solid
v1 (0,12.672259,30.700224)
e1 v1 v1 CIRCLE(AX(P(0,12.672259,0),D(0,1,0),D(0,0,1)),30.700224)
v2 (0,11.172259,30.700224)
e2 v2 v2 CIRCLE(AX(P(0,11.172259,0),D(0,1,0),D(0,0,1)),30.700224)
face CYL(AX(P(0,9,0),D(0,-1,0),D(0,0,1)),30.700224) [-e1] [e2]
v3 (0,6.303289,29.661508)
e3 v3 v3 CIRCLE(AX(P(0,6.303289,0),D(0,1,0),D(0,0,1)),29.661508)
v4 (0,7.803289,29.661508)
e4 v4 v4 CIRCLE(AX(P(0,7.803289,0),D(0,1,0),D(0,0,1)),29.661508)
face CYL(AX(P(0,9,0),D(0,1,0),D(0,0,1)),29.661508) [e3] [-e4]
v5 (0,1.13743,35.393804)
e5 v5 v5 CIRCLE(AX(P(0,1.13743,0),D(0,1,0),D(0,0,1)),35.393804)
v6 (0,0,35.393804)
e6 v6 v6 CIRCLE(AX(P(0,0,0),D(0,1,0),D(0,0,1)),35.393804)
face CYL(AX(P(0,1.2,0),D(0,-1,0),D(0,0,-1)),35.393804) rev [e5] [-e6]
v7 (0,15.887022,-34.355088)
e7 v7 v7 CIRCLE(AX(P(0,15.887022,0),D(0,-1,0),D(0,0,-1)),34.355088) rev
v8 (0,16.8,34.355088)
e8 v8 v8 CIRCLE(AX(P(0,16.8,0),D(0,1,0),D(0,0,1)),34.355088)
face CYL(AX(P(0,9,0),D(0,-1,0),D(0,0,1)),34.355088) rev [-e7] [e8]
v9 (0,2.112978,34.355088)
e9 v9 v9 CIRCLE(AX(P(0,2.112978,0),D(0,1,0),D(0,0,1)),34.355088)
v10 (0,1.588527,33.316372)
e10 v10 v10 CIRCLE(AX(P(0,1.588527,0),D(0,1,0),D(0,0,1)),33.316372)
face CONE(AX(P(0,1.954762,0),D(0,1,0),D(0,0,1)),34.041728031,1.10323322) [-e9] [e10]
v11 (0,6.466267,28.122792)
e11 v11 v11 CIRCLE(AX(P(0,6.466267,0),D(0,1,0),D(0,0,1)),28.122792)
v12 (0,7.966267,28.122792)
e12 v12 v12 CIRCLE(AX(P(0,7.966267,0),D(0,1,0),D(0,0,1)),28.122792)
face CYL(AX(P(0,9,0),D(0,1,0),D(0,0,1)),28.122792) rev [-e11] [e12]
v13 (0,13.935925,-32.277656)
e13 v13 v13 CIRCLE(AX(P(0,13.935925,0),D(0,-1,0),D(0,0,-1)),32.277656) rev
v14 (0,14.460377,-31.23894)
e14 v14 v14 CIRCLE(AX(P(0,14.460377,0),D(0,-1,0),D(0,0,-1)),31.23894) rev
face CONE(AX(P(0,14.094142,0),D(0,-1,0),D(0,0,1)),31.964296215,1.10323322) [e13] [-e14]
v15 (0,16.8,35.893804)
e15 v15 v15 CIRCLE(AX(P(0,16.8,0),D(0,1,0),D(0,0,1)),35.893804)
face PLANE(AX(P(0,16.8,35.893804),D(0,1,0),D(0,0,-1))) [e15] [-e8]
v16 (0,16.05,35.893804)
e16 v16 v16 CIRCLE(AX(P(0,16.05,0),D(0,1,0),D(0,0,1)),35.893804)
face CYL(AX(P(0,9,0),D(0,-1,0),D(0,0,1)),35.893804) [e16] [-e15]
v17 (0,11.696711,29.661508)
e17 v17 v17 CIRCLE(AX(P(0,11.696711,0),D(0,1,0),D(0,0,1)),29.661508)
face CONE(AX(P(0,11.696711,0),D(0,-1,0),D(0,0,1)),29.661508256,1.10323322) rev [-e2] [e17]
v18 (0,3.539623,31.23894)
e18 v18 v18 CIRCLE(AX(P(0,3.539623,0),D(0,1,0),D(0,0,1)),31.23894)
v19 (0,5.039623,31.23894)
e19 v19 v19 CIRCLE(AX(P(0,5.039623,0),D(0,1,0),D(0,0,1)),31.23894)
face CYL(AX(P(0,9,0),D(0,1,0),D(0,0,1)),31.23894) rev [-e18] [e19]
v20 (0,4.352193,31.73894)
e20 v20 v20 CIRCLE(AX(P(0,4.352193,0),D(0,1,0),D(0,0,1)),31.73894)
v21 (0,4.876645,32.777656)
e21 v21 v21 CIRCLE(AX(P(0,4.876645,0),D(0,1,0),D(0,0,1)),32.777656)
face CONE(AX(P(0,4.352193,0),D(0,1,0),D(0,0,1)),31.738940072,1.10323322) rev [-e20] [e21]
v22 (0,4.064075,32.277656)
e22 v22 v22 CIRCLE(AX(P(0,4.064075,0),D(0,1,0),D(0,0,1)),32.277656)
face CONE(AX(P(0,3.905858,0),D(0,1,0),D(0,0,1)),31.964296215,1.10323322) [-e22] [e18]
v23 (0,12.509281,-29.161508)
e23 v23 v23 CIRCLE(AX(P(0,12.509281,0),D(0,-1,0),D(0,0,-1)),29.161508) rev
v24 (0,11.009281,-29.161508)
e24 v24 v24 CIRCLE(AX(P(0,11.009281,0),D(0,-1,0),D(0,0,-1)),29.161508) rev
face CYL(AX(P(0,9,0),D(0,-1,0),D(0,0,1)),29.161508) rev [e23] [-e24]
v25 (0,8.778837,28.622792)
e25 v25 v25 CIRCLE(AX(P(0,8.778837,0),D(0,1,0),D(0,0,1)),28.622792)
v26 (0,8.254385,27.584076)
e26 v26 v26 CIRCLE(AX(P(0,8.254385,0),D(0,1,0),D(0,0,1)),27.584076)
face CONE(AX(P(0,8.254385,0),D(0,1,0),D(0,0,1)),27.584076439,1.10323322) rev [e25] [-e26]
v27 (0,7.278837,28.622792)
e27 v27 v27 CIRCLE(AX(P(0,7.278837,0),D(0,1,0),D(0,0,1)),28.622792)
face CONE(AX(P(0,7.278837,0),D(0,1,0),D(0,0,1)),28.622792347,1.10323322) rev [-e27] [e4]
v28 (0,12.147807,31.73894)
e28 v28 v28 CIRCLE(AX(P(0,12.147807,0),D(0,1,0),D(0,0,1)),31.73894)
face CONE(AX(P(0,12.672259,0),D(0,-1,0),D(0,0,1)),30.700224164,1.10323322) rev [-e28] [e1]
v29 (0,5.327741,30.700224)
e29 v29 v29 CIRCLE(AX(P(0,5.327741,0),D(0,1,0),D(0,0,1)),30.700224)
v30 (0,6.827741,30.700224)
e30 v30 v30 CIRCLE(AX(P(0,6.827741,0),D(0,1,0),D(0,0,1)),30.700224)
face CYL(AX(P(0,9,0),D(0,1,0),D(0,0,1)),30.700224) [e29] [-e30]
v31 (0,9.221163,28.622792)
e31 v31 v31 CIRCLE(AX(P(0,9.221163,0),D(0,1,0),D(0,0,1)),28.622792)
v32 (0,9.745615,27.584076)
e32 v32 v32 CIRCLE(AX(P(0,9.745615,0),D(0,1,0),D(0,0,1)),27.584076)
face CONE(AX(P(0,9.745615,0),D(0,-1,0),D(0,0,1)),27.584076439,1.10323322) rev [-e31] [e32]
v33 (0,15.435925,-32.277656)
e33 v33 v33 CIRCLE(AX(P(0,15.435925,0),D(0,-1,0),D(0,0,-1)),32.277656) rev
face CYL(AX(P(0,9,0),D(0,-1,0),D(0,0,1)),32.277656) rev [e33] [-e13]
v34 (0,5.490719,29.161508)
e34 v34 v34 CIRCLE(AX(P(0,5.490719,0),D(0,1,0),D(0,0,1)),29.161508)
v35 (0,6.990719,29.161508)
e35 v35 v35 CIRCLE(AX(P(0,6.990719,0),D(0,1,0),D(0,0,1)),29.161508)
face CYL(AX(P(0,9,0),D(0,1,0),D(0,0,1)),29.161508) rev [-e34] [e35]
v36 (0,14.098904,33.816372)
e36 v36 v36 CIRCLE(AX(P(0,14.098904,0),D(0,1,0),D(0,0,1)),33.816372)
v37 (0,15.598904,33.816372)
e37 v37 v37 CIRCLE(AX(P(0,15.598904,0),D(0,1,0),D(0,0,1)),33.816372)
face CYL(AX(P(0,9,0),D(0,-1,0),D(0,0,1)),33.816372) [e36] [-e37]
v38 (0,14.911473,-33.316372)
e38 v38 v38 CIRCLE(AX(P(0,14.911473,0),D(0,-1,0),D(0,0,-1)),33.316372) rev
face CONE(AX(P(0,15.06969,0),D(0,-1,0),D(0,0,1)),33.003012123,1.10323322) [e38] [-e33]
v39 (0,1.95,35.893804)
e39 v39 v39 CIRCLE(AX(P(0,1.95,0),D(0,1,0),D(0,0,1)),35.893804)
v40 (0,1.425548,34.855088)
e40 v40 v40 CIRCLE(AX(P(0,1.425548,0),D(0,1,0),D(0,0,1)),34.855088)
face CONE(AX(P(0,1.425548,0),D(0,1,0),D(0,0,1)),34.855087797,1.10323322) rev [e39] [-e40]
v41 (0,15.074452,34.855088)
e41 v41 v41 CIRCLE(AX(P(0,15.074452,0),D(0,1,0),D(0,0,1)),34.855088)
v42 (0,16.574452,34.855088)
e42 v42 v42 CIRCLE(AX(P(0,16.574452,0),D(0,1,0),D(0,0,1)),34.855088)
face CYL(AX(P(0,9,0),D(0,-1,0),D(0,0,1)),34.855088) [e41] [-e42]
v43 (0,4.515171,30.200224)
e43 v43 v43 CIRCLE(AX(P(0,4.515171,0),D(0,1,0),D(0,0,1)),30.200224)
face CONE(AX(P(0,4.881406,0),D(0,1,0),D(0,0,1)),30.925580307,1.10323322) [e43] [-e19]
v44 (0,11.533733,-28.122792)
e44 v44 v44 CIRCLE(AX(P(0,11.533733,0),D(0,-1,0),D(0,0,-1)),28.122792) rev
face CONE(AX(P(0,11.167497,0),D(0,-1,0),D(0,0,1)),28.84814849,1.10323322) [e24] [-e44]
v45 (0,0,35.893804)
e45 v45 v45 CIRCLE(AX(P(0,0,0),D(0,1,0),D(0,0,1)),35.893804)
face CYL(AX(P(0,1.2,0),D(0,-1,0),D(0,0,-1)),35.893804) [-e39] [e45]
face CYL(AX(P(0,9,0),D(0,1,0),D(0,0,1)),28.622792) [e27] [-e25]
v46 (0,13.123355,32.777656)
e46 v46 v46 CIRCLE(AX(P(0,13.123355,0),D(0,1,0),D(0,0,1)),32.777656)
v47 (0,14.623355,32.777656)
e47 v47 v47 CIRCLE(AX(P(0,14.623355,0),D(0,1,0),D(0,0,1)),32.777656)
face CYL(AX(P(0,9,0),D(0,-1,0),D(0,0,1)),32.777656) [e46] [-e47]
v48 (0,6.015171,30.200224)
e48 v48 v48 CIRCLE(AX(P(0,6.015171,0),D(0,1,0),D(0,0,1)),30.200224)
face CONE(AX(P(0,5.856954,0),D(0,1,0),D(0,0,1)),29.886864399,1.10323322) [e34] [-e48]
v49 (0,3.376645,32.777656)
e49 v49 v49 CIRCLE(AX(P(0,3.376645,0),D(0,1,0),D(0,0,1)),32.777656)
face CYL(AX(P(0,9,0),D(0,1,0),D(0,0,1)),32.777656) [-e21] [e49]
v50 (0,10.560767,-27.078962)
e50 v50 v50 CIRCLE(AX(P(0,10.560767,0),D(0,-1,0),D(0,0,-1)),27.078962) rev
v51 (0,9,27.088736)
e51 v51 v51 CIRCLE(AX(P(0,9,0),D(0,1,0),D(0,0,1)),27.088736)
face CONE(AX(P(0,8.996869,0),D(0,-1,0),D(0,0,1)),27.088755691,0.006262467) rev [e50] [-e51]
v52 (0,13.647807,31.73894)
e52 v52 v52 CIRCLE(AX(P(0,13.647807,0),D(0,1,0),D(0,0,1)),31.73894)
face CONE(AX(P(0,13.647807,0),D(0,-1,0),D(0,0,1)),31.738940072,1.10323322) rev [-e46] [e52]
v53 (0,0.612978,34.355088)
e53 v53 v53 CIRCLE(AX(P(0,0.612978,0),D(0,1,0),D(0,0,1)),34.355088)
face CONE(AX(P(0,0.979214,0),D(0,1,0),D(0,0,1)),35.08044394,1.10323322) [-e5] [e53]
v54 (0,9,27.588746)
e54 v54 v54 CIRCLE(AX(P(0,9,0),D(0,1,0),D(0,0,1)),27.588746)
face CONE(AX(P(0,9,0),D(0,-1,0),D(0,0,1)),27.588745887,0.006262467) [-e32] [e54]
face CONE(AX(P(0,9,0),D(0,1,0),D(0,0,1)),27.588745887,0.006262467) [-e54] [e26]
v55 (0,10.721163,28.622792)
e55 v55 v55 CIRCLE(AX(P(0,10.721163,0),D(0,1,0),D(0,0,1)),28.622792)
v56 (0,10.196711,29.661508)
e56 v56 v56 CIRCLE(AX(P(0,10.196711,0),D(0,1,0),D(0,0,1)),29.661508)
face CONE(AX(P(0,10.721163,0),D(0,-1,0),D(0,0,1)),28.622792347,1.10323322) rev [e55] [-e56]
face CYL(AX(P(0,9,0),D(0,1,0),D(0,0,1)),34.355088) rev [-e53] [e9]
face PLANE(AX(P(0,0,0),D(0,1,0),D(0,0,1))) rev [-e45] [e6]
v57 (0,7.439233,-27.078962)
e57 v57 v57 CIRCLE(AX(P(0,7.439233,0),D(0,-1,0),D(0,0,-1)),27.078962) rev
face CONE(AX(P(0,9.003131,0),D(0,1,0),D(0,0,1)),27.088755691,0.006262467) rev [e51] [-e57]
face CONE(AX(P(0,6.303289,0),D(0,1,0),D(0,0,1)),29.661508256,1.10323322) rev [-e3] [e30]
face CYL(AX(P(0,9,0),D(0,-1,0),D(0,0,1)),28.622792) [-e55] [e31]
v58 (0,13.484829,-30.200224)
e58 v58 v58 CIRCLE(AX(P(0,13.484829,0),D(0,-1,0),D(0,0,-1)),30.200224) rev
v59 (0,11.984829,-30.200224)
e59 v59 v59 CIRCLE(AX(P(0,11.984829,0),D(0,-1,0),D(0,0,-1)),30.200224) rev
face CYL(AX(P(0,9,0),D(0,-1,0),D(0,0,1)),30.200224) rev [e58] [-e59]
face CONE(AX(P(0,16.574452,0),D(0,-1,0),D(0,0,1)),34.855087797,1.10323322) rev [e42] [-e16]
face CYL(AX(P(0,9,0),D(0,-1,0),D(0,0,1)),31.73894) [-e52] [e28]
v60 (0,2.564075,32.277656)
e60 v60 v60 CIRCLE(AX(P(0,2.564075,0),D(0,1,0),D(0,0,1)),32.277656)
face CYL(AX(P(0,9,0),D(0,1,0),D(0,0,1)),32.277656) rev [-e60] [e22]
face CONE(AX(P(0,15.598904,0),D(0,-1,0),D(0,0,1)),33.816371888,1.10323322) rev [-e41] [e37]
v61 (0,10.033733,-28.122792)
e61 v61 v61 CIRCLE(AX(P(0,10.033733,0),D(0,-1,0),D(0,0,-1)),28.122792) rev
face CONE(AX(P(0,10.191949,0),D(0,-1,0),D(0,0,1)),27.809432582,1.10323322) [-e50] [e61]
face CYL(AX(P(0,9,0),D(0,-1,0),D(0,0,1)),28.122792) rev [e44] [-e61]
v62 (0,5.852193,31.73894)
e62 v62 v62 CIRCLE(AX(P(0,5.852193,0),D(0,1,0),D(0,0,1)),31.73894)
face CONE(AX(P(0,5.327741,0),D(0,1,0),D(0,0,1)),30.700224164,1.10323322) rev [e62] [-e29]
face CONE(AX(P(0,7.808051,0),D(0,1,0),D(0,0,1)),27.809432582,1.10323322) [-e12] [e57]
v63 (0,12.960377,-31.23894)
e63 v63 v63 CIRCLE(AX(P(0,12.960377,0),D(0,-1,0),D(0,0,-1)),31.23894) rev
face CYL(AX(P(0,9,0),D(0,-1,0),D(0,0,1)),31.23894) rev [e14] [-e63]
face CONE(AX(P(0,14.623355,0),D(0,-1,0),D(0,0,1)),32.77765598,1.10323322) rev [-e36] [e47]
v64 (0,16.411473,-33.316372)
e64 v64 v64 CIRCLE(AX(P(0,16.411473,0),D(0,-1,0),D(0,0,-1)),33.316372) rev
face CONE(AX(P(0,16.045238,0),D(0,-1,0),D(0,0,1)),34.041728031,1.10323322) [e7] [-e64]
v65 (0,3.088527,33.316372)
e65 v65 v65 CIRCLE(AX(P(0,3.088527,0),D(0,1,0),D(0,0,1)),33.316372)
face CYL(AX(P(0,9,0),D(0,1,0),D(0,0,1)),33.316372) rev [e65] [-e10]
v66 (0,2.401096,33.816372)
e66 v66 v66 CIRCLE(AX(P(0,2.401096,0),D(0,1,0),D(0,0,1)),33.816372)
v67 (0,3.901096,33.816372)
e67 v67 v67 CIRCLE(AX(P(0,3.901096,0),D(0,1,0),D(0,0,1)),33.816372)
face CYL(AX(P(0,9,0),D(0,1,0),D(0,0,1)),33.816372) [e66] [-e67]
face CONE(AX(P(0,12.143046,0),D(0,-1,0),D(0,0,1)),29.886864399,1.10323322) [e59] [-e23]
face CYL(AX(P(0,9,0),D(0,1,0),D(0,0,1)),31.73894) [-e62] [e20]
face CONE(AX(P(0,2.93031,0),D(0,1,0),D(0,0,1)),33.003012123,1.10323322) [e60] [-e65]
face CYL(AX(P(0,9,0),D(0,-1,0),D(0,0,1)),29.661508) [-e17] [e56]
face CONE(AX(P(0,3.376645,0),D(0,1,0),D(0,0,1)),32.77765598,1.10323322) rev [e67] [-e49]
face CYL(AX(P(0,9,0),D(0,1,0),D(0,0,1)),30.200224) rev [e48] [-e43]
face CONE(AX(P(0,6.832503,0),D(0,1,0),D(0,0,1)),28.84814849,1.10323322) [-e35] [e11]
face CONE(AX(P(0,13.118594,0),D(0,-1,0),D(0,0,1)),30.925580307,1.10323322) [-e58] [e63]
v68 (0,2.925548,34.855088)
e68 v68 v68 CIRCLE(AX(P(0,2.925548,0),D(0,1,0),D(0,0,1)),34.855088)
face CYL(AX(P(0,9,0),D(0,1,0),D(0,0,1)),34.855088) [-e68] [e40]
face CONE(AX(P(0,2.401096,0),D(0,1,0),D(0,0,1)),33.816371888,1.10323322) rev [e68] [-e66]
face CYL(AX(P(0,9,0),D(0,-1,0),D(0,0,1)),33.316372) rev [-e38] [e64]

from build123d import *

# Parameters (mm, degrees)
SKETCH_1_R      = 35.893803705
EXTRUDE_1_DEPTH = 1.2


# Read off the part's stored shape, not the designer's step: 쉘1
with BuildPart() as part:
    # 스케치1 → 보스-돌출1 (new body)
    with BuildSketch(Plane(origin=(0, 0, 0), x_dir=(1, 0, 0), z_dir=(0, 1, 0))):
        with Locations(Location((0, 0, 0), (0, 0, 270))):
            Circle(SKETCH_1_R)
    extrude(amount=EXTRUDE_1_DEPTH)

    # 스케치4 → 회전1 (revolve)
    with BuildSketch(Plane(origin=(0, 0, 0), x_dir=(0, 0, -1), z_dir=(1, 0, 0))):
        Polygon((-27.588745887, 9), (0, 9), (0, 1.2), (-35.893803705, 1.2), (-35.893803705, 1.95), (-34.855087797, 1.425548185), (-34.855087797, 2.925548185), (-33.816371888, 2.401096371), (-33.816371888, 3.901096371), (-32.77765598, 3.376644556), (-32.77765598, 4.876644556), (-31.738940072, 4.352192742), (-31.738940072, 5.852192742), (-30.700224164, 5.327740927), (-30.700224164, 6.827740927), (-29.661508256, 6.303289112), (-29.661508256, 7.803289112), (-28.622792347, 7.278837298), (-28.622792347, 8.778837298), (-27.584076439, 8.254385483), align=None)
    revolve_1 = revolve(axis=Axis((0, 9, 0), (0, -1, 0)))

    # 대칭 복사1: 회전1 across plane
    add(revolve_1.mirror(Plane(origin=(0, 9, 27.588745887), x_dir=(0, 0, 1), z_dir=(0, 1, 0))))

    # 쉘1 outline → 쉘1 (revolve, cut)
    with BuildSketch(Plane.XY):
        Polygon((35.393803705, 0), (35.393803705, 1.137430146), (34.355087797, 0.612978331), (34.355087797, 2.112978331), (33.316371888, 1.588526517), (33.316371888, 3.088526517), (32.27765598, 2.564074702), (32.27765598, 4.064074702), (31.238940072, 3.539622887), (31.238940072, 5.039622887), (30.200224164, 4.515171073), (30.200224164, 6.015171073), (29.161508256, 5.490719258), (29.161508256, 6.990719258), (28.122792347, 6.466267444), (28.122792347, 7.966267444), (27.078961703, 7.439233178), (27.088736082, 9), (27.078961703, 10.560766822), (28.122792347, 10.033732556), (28.122792347, 11.533732556), (29.161508256, 11.009280742), (29.161508256, 12.509280742), (30.200224164, 11.984828927), (30.200224164, 13.484828927), (31.238940072, 12.960377113), (31.238940072, 14.460377113), (32.27765598, 13.935925298), (32.27765598, 15.435925298), (33.316371888, 14.911473483), (33.316371888, 16.411473483), (34.355087797, 15.887021669), (34.355087797, 16.8), (0, 16.8), (0, 0), align=None)
    revolve(axis=Axis((0, 0, 0), (0, 1, 0)), mode=Mode.SUBTRACT)


solid = part.part
